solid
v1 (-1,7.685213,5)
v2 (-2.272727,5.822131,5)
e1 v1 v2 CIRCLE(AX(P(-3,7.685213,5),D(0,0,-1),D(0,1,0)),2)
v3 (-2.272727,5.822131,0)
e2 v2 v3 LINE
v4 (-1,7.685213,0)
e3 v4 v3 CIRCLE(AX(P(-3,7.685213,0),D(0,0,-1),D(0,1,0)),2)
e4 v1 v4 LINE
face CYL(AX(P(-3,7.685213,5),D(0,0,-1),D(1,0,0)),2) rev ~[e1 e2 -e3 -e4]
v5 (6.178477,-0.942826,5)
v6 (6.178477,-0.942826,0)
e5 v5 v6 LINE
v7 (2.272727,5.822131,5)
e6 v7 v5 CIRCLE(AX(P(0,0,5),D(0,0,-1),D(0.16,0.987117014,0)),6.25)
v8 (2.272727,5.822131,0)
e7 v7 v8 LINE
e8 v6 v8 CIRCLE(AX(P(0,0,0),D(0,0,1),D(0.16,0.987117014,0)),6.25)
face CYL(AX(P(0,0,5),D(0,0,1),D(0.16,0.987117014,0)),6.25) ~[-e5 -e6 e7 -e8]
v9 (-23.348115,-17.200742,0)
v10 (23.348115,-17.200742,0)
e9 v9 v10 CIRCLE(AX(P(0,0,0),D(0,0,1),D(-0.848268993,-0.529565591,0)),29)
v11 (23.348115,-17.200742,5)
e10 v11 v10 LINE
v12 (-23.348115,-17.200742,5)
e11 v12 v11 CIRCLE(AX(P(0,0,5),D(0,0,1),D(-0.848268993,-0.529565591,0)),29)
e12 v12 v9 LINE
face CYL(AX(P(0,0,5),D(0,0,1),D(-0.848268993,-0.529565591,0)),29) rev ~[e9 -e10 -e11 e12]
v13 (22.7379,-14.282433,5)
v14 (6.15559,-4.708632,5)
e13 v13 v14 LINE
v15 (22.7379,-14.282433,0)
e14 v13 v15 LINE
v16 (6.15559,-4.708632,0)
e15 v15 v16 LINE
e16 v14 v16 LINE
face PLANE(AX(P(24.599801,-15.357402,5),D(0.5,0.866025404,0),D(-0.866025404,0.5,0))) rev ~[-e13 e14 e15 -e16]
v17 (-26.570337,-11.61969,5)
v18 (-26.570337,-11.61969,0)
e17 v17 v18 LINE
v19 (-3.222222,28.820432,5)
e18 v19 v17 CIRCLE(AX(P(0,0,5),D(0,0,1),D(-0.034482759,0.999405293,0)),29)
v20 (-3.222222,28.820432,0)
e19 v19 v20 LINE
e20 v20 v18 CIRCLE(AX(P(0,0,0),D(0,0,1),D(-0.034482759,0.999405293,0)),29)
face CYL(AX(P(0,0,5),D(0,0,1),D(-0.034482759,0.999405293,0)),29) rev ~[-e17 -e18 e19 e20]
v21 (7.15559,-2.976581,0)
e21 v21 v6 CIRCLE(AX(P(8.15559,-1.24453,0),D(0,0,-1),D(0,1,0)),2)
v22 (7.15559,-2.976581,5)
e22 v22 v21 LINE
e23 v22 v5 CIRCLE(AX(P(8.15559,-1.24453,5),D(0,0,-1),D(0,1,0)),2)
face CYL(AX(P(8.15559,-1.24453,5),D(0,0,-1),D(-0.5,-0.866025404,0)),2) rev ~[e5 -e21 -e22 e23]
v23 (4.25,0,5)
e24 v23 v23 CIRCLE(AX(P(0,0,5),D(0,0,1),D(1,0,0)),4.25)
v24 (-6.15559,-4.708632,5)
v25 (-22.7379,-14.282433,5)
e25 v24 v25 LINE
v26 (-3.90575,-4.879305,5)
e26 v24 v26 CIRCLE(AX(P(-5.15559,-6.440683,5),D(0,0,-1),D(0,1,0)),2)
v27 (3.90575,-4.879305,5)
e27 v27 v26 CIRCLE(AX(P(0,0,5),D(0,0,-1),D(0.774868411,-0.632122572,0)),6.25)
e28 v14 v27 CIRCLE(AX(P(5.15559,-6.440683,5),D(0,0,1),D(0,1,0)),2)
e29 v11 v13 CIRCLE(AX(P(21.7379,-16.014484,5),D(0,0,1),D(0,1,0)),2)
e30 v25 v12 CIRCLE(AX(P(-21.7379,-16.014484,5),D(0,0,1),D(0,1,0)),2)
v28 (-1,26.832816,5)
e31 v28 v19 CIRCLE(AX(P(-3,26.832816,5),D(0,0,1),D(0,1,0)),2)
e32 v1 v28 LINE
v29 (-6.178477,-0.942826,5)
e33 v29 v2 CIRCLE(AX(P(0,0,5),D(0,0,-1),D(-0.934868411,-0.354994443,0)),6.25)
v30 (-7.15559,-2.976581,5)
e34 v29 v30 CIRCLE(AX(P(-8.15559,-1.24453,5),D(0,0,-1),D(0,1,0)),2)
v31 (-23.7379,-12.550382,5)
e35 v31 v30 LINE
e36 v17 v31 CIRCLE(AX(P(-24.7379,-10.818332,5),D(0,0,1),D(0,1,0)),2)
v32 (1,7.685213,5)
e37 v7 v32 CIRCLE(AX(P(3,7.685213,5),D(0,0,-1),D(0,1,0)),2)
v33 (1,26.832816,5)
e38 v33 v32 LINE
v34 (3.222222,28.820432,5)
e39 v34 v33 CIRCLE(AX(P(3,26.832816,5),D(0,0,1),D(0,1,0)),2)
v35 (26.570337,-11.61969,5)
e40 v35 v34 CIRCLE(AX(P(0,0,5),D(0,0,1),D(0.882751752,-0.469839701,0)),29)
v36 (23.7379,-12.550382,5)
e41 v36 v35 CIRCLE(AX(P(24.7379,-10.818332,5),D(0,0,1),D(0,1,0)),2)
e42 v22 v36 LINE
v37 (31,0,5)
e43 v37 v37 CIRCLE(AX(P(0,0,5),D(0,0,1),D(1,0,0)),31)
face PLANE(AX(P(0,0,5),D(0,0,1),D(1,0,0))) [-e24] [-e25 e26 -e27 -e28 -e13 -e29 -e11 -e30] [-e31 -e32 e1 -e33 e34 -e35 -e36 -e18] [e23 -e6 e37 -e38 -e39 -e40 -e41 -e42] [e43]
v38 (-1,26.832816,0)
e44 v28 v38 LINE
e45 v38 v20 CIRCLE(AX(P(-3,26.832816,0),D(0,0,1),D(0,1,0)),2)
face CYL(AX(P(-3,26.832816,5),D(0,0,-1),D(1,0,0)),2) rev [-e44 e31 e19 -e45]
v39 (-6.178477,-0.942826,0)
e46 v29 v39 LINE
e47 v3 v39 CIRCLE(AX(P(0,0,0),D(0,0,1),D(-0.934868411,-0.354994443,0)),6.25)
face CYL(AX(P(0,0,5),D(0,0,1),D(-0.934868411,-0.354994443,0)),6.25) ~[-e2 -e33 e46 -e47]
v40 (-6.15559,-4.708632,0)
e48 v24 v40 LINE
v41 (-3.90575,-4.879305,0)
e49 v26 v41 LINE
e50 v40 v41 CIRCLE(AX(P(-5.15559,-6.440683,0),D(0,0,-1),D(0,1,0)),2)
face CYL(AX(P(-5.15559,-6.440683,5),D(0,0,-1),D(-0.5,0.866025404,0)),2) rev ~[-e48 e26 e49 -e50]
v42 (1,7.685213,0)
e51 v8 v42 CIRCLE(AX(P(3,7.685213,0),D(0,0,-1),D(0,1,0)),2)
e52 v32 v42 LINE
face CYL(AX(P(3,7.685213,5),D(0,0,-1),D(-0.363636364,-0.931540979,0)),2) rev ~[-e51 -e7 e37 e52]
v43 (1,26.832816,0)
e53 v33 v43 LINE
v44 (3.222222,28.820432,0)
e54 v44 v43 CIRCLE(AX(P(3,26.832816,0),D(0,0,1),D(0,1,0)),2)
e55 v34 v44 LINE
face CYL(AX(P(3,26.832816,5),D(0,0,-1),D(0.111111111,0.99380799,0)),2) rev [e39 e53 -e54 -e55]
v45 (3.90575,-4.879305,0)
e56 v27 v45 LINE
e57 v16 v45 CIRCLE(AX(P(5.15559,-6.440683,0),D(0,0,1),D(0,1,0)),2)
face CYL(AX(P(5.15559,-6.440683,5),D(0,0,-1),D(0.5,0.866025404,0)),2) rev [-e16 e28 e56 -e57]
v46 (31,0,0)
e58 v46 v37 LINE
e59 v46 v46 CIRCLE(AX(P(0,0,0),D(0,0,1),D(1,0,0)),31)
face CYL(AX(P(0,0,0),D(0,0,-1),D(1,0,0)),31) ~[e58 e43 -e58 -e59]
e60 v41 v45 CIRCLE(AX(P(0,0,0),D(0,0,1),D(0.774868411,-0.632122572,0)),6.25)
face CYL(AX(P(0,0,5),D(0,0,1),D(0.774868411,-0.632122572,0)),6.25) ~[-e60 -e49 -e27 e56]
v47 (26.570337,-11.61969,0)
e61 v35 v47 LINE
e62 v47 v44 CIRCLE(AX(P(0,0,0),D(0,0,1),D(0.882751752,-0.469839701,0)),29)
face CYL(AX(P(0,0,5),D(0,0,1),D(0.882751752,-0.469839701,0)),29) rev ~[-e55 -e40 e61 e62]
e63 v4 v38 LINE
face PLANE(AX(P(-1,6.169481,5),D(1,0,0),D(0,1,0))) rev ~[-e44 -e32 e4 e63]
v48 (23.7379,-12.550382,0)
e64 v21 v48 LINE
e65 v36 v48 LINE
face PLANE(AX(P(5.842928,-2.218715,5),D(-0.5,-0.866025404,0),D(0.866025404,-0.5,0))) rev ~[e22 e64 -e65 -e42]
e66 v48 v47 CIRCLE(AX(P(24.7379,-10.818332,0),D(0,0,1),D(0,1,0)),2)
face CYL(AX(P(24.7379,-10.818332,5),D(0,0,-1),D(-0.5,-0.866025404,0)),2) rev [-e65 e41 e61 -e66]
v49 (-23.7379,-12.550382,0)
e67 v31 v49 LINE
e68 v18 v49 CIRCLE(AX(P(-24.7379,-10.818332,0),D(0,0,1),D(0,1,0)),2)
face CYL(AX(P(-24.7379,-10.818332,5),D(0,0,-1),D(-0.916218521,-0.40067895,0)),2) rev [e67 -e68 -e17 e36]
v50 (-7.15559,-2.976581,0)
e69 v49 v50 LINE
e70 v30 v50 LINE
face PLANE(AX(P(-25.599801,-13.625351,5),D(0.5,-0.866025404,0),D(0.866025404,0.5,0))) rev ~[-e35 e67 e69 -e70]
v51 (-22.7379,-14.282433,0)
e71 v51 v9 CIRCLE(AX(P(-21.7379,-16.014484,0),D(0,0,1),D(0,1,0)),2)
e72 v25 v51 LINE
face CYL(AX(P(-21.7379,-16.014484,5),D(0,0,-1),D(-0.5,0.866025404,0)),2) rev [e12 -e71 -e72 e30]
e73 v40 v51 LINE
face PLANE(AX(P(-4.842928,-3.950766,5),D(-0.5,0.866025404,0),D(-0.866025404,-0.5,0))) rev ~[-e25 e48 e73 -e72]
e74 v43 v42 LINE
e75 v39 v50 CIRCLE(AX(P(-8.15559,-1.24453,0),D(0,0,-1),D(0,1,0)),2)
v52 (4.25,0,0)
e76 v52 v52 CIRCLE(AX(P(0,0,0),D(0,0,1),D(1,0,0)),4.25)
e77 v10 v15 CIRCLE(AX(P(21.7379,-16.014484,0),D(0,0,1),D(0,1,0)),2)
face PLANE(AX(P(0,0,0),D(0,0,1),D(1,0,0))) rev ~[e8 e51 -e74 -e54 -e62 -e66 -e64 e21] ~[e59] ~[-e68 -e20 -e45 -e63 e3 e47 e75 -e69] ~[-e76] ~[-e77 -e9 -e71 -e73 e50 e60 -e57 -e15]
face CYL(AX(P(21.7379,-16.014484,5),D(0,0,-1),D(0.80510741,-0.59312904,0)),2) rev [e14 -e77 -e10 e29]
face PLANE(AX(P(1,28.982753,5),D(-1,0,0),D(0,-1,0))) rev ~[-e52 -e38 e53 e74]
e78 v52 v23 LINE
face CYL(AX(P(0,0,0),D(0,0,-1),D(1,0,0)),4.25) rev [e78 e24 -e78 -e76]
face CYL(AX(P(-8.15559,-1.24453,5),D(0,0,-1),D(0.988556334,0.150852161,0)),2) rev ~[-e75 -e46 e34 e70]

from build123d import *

# Parameters (mm, degrees)
F0_R            = 31
F0_R_2          = 4.25
F1_DEPTH        = 5
F3_DEPTH        = 25
F3_COPIES_COUNT = 3
F4_R            = 2


# Not quite as in the source:
# - a pattern or mirror of a feature is missing from the dataset's text; its kind, count and spacing are read off the source's solid


with BuildPart() as f1:
    # F0 (on Top) → F1 (new body)
    with BuildSketch(Plane.XY):
        Circle(F0_R)
        Circle(F0_R_2, mode=Mode.SUBTRACT)
    extrude(amount=F1_DEPTH)

    # F2 (on face) → F3 (cut)
    with BuildSketch(Plane.XY.offset(5)):
        with BuildLine():
            ThreePointArc((1, 6.1694813396), (5.4126587737, 3.125), (5.8429275683, -2.218715266))
            Line((5.8429275683, -2.218715266), (25.599800796, -13.6253513424))
            ThreePointArc((25.599800796, -13.6253513424), (25.1147367097, 14.5), (1, 28.9827534924))
            Line((1, 28.9827534924), (1, 6.1694813396))
        make_face()
    f3 = extrude(amount=-F3_DEPTH, mode=Mode.SUBTRACT)

    # F3_copies: F3 ×3 about axis
    f3_copies_axis = Axis((0, 0, 0), (0, 0, 1))
    for i in range(1, F3_COPIES_COUNT):
        add(f3.rotate(f3_copies_axis, i * 360 / F3_COPIES_COUNT), mode=Mode.SUBTRACT)

    # F4
    f4_edges = [f1.edges().sort_by_distance(p)[0] for p in [
        (1, 6.169481, 2.5),
        (5.842928, -2.218715, 2.5),
        (25.599801, -13.625351, 2.5),
        (1, 28.982753, 2.5),
        (24.599801, -15.357402, 2.5),
        (-24.599801, -15.357402, 2.5),
        (4.842928, -3.950766, 2.5),
        (-4.842928, -3.950766, 2.5),
        (-25.599801, -13.625351, 2.5),
        (-1, 28.982753, 2.5),
        (-1, 6.169481, 2.5),
        (-5.842928, -2.218715, 2.5),
    ]]
    fillet(f4_edges, radius=F4_R)


solid = f1.part
